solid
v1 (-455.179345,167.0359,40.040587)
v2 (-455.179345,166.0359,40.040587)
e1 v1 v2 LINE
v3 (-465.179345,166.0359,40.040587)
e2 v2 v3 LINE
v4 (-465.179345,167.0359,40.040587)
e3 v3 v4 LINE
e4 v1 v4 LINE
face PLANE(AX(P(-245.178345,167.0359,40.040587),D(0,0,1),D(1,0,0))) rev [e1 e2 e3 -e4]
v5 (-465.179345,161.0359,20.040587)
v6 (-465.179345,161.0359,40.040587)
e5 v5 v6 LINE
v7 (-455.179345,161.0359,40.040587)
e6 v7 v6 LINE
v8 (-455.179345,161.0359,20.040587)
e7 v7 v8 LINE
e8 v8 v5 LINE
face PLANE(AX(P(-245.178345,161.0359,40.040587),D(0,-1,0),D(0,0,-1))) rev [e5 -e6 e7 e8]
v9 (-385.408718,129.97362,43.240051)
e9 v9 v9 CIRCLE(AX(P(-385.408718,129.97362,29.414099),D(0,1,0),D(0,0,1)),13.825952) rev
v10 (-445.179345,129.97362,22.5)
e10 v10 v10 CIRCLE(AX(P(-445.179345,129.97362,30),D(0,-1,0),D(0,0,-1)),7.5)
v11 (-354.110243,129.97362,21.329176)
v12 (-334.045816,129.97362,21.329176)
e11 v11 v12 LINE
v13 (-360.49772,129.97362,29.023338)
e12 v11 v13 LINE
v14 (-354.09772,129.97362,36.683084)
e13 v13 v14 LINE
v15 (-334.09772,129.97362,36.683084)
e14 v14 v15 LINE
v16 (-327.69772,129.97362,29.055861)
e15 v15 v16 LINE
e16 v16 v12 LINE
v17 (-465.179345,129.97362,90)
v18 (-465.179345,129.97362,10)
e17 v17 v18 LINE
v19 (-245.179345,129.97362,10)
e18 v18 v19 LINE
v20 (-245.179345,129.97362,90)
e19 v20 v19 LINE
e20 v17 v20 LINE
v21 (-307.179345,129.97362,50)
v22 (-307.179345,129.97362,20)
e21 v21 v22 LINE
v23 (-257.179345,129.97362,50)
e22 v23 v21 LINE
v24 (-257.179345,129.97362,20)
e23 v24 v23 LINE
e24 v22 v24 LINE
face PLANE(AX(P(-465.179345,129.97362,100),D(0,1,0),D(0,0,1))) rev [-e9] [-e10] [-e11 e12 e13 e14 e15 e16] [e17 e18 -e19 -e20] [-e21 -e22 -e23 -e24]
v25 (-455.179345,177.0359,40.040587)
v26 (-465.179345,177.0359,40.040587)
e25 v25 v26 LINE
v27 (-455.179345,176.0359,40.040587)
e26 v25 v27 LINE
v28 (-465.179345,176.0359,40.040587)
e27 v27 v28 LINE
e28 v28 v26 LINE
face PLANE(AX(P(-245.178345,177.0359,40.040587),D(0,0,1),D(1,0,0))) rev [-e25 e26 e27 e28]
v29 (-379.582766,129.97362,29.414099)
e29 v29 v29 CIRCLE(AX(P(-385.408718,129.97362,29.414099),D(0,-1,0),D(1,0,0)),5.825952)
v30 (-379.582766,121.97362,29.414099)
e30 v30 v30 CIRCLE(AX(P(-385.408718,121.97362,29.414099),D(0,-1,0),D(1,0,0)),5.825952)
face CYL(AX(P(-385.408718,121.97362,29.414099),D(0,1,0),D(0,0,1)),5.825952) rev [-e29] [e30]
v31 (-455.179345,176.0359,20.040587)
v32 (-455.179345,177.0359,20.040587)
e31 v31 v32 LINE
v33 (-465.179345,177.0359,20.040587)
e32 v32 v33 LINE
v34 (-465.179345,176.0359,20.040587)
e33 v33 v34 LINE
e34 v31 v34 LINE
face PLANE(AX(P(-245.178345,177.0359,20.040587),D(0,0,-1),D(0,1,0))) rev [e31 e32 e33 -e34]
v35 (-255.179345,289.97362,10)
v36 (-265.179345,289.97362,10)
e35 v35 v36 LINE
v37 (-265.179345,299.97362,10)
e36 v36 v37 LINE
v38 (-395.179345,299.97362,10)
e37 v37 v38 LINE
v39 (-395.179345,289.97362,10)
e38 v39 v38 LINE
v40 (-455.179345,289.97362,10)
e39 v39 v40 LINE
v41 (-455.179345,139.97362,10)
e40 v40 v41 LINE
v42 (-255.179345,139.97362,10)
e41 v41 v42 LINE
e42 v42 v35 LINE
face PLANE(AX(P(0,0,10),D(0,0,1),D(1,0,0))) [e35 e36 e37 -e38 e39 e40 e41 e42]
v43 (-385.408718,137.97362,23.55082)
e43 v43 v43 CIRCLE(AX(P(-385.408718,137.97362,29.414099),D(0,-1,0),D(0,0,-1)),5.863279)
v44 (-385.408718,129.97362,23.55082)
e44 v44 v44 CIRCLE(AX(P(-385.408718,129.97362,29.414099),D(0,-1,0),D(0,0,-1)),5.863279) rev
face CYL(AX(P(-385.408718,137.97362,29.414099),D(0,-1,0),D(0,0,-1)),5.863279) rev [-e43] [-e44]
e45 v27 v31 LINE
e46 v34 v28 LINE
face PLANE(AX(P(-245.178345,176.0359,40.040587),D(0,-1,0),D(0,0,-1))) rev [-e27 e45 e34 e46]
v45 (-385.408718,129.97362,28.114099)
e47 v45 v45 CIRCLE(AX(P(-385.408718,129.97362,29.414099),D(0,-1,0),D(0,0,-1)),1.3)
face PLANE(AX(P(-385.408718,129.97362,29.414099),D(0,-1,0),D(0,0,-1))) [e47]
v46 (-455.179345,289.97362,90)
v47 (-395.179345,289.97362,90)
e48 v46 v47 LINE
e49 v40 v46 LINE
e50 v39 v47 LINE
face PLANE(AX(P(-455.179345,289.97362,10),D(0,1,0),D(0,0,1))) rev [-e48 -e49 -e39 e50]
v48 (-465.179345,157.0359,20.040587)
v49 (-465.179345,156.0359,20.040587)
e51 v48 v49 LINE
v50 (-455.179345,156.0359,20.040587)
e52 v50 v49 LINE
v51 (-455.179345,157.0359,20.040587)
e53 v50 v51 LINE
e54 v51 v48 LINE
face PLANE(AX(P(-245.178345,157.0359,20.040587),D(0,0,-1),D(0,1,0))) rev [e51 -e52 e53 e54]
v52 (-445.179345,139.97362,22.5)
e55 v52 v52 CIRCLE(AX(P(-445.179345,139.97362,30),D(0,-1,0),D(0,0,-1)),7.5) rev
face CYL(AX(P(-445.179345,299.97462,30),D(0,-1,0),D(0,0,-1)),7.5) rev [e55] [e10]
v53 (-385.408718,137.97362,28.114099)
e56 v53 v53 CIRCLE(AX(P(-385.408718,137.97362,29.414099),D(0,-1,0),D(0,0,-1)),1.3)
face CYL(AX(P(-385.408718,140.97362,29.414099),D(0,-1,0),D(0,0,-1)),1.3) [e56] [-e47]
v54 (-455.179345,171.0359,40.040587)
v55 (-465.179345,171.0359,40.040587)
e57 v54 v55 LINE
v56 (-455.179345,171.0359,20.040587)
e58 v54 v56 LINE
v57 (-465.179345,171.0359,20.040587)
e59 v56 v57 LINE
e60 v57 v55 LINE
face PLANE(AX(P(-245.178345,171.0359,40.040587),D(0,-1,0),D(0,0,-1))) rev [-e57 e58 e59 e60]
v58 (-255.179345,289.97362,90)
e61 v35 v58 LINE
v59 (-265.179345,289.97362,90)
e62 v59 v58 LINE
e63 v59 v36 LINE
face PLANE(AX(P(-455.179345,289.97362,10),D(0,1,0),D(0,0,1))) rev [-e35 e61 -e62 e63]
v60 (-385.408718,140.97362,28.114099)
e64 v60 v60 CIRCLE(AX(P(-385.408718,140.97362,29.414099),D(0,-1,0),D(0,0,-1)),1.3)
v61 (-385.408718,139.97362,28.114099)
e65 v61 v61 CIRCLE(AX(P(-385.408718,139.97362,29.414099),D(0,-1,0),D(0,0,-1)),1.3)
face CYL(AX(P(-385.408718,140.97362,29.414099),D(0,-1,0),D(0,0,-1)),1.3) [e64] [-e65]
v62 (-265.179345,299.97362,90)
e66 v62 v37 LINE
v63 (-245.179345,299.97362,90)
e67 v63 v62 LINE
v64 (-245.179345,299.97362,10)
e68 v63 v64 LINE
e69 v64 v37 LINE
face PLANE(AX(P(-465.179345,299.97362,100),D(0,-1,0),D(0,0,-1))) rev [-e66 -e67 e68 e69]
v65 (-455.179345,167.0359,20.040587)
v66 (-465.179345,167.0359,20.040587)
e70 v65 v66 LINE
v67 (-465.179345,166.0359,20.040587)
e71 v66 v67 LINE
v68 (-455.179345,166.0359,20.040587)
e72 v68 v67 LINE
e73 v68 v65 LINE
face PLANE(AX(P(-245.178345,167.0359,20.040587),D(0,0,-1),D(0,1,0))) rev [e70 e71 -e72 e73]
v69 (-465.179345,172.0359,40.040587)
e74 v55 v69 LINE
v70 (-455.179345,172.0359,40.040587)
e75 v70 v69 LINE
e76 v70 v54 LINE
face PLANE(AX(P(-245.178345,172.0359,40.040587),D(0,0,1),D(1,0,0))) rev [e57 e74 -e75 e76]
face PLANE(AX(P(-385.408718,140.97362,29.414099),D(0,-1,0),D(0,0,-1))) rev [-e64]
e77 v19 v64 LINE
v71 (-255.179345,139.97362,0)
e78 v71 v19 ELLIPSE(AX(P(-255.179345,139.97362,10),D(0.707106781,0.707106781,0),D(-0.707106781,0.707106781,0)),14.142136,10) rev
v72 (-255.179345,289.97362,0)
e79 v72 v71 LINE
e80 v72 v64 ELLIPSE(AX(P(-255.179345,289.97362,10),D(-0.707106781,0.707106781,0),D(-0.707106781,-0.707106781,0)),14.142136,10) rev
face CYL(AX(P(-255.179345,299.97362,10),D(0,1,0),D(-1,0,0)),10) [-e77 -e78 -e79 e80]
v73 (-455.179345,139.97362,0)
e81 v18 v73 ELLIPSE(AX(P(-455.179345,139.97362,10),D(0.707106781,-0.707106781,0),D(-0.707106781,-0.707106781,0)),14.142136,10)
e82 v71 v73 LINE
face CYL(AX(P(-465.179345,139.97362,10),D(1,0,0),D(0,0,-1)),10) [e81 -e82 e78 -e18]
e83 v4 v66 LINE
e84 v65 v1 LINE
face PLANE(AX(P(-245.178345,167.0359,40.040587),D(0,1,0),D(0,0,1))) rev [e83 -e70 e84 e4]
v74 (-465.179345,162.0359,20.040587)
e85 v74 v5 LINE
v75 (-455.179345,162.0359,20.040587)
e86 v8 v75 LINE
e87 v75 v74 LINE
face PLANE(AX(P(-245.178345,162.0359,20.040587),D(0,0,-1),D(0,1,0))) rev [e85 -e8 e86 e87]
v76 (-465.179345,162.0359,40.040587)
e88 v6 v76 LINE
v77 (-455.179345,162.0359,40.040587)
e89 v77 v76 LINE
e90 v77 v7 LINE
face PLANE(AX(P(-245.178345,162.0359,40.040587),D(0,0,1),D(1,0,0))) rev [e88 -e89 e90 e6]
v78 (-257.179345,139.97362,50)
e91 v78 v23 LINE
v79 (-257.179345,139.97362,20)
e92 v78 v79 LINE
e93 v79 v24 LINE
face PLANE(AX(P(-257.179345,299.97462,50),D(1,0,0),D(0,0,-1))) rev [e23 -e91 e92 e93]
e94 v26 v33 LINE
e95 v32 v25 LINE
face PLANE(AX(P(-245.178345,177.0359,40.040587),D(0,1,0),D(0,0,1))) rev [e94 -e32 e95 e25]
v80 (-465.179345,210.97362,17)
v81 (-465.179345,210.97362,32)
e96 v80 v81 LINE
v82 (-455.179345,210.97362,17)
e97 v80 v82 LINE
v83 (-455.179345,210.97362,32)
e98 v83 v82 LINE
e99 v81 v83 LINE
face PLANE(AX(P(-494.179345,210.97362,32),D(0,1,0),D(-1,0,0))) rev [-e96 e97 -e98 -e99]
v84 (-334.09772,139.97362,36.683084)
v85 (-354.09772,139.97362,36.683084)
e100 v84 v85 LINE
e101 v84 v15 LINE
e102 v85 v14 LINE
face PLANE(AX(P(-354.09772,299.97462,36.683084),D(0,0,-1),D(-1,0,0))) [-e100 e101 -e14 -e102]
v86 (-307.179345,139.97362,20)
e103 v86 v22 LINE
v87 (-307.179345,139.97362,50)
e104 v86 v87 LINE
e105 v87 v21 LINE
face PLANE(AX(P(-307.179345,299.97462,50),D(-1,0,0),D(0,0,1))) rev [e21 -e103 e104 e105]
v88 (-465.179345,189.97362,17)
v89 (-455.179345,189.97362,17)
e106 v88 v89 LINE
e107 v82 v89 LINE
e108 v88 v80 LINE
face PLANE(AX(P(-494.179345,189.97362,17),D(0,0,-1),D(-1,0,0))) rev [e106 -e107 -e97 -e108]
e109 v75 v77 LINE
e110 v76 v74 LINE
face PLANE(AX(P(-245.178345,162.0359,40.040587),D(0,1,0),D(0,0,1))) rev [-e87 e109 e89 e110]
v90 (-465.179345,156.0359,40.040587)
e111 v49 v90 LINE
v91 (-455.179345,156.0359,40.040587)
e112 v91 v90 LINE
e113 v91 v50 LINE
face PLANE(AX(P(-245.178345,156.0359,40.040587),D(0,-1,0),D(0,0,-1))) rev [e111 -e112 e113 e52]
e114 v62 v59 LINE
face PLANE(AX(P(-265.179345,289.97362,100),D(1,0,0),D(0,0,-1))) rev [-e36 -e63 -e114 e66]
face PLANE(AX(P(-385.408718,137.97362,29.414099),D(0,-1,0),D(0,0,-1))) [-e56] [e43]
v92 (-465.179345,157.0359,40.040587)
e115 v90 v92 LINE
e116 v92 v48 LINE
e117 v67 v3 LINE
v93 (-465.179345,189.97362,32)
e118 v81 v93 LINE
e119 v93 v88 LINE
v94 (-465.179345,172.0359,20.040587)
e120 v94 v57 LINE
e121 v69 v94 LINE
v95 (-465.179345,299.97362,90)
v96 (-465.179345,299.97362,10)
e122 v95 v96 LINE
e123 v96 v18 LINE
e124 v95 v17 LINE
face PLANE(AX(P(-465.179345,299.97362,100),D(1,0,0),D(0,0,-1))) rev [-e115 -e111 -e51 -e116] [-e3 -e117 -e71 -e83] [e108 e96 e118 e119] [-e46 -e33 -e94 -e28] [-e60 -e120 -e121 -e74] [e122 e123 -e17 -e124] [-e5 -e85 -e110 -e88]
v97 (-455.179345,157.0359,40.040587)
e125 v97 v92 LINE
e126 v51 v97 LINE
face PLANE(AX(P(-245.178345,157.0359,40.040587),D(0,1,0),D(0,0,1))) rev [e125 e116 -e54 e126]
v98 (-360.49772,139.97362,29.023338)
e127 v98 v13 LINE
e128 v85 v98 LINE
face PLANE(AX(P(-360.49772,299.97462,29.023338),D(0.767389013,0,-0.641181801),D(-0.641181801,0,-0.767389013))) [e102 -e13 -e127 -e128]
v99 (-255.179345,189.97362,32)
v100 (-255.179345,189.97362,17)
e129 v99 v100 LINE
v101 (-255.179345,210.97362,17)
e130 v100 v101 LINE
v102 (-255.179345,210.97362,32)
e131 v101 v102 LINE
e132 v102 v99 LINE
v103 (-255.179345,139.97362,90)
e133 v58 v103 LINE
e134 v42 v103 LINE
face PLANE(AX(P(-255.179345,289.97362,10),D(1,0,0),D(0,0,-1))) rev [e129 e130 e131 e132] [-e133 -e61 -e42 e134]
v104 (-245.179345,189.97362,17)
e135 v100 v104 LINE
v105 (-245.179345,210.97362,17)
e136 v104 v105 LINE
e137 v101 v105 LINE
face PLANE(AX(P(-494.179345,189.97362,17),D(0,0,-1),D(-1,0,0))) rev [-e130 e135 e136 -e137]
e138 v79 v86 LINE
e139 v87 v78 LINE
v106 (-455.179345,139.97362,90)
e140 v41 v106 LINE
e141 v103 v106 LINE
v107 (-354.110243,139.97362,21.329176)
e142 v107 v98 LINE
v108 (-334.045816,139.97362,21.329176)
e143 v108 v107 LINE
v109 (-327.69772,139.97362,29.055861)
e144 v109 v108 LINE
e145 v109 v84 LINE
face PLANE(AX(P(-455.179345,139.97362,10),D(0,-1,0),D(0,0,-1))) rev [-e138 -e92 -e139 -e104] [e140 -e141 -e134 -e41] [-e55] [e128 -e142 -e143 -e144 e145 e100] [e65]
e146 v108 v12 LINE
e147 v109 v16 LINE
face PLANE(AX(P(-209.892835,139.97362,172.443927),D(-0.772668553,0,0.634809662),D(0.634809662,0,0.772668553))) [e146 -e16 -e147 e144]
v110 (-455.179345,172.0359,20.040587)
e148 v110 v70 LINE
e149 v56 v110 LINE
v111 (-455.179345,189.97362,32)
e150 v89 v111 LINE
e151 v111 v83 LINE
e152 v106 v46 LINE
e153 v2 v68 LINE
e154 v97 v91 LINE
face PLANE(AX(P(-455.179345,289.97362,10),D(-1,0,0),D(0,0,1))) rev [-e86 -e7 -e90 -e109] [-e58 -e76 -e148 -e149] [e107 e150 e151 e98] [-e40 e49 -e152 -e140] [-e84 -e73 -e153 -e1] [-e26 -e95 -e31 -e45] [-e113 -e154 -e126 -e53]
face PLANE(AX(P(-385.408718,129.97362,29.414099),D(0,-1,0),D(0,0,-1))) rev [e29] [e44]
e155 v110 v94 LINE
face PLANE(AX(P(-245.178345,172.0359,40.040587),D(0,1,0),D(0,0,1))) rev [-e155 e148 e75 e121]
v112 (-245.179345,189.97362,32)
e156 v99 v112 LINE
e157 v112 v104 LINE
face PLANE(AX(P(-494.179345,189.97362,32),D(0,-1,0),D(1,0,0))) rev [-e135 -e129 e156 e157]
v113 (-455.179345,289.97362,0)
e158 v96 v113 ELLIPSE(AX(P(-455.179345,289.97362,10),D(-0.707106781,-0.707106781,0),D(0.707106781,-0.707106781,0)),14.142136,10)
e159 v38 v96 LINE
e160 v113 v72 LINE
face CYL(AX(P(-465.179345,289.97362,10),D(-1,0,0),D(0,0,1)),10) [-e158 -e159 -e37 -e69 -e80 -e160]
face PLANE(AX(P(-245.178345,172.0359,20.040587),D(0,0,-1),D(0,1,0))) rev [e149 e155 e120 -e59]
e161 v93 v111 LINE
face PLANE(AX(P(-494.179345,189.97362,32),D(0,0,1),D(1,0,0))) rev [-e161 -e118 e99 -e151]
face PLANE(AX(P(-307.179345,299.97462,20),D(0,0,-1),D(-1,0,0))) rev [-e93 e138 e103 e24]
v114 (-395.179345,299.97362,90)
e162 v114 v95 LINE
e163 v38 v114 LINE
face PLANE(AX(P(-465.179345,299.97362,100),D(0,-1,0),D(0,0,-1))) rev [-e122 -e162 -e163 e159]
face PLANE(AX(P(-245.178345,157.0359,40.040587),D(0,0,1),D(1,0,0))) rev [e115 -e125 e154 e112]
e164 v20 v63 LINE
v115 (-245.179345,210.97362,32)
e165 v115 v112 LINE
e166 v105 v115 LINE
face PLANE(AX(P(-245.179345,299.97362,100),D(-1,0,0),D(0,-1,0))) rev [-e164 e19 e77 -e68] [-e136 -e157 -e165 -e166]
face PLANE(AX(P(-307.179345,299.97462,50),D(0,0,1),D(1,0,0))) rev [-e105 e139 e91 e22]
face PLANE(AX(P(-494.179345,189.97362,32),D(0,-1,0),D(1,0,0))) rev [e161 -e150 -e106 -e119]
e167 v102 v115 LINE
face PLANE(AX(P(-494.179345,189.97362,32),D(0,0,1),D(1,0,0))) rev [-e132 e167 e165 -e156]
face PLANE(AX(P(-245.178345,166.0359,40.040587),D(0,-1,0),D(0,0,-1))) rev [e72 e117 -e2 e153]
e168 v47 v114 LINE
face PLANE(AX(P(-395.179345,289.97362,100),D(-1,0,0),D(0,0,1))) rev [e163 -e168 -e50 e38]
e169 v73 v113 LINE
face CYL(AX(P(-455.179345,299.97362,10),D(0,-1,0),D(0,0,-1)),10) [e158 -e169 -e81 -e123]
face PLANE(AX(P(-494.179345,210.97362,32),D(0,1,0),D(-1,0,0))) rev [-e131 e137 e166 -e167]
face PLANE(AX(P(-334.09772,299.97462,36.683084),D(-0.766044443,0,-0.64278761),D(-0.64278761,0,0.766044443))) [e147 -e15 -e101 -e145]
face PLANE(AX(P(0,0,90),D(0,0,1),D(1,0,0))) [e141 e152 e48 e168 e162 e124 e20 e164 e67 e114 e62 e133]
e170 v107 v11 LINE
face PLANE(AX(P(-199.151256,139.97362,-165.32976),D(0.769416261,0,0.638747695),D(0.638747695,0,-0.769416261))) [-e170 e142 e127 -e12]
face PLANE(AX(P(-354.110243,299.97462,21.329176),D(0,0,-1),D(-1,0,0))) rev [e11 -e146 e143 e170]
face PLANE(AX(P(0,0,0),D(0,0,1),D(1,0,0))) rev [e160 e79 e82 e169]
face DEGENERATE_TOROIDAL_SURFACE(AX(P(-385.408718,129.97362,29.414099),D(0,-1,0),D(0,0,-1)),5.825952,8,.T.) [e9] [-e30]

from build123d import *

# Parameters (mm, degrees)
SKETCH1_W                = 220
SKETCH1_H                = 170
BOSS_EXTRUDE1_DEPTH      = 100
SKETCH3_W                = 200
SKETCH3_H                = 150
CUT_EXTRUDE2_DEPTH       = 90
FILLET1_R                = 10
SKETCH4_W                = 130
SKETCH4_H                = 90
CUT_EXTRUDE3_DEPTH       = 10
SKETCH8_W                = 223.528125383
SKETCH8_H                = 171.877504909
CUT_EXTRUDE5_DEPTH       = 10
CUT_EXTRUDE7_REACH       = 505.38
SKETCH9_R                = 7.5
CUT_EXTRUDE8_REACH       = 505.38
SKETCH10_W               = 50
SKETCH10_H               = 30
CUT_EXTRUDE9_REACH       = 384.733
SKETCH11_W               = 20
SKETCH11_H               = 1
CUT_EXTRUDE10_REACH      = 505.38
CUT_EXTRUDE11_DEPTH      = 10
CUT_EXTRUDE12_REACH      = 505.38
SKETCH15_R               = 5.863278905
CUT_EXTRUDE13_DEPTH      = 8
BOSS_EXTRUDE3_DEPTH      = 8
BOSS_EXTRUDE3_DEPTH_BACK = 3
SKETCH16_R               = 1.3
SKETCH17_R               = 13.825952239
SKETCH17_R_2             = 5.825952239
EXTRUDE_THIN1_DEPTH      = 8
FILLET2_R                = 8
SKETCH18_W               = 15
SKETCH18_H               = 21
CUT_EXTRUDE14_DEPTH      = 249


with BuildPart() as part:
    # Sketch1 → Boss-Extrude1 (new body)
    with BuildSketch(Plane.XY):
        with Locations((-355.179344655, 214.973620006)):
            Rectangle(SKETCH1_W, SKETCH1_H)
    extrude(amount=BOSS_EXTRUDE1_DEPTH)

    # Sketch3 → Cut-Extrude2 (cut)
    with BuildSketch(Plane.XY.offset(100)):
        with Locations((-355.179344655, 214.973620006)):
            Rectangle(SKETCH3_W, SKETCH3_H)
    extrude(amount=-CUT_EXTRUDE2_DEPTH, mode=Mode.SUBTRACT)

    # Fillet1
    fillet1_edges = [part.edges().sort_by_distance(p)[0] for p in [
        (-355.179344655, 299.973620006, 0),
        (-245.179344655, 214.973620006, 0),
        (-355.179344655, 129.973620006, 0),
        (-465.179344655, 214.973620006, 0),
    ]]
    fillet(fillet1_edges, radius=FILLET1_R)

    # Sketch4 → Cut-Extrude3 (cut)
    with BuildSketch(Plane(origin=(0, 299.973620006, 0), x_dir=(1, 0, 0), z_dir=(0, 1, 0))):
        with Locations((-330.179344655, -55)):
            Rectangle(SKETCH4_W, SKETCH4_H)
    extrude(amount=-CUT_EXTRUDE3_DEPTH, mode=Mode.SUBTRACT)

    # Sketch8 → Cut-Extrude5 (cut)
    with BuildSketch(Plane.XY.offset(90)):
        with Locations((-354.80209528, 215.143634814)):
            Rectangle(SKETCH8_W, SKETCH8_H)
    extrude(amount=CUT_EXTRUDE5_DEPTH, mode=Mode.SUBTRACT)

    # Sketch9 → Cut-Extrude7 (cut, up to next)
    with BuildSketch(Plane.XZ.offset(-129.973620006), mode=Mode.PRIVATE) as cut_extrude7_sk1:
        with Locations(Location((-445.179344655, 30, 0), (0, 0, 270))):
            Circle(SKETCH9_R)
    cut_extrude7_tool1 = extrude(cut_extrude7_sk1.sketch, amount=-CUT_EXTRUDE7_REACH, mode=Mode.PRIVATE) & part.part
    add(cut_extrude7_tool1.solids().sort_by_distance((-445.179345, 129.97362, 30))[0], mode=Mode.SUBTRACT)

    # Sketch10 → Cut-Extrude8 (cut, up to next)
    with BuildSketch(Plane.XZ.offset(-129.973620006), mode=Mode.PRIVATE) as cut_extrude8_sk1:
        with Locations((-282.179344655, 35)):
            Rectangle(SKETCH10_W, SKETCH10_H)
    cut_extrude8_tool1 = extrude(cut_extrude8_sk1.sketch, amount=-CUT_EXTRUDE8_REACH, mode=Mode.PRIVATE) & part.part
    add(cut_extrude8_tool1.solids().sort_by_distance((-282.179345, 129.97362, 35))[0], mode=Mode.SUBTRACT)

    # Sketch11 → Cut-Extrude9 (cut, up to next)
    with BuildSketch(Plane.ZY.offset(465.179344655), mode=Mode.PRIVATE) as cut_extrude9_sk1:
        with Locations((30.04058668, 161.535899553)):
            Rectangle(SKETCH11_W, SKETCH11_H)
    cut_extrude9_tool1 = extrude(cut_extrude9_sk1.sketch, amount=-CUT_EXTRUDE9_REACH, mode=Mode.PRIVATE) & part.part
    # Sketch11 → Cut-Extrude9 (cut, up to next)
    with BuildSketch(Plane.ZY.offset(465.179344655), mode=Mode.PRIVATE) as cut_extrude9_sk2:
        with Locations((30.04058668, 156.535899553)):
            Rectangle(SKETCH11_W, SKETCH11_H)
    cut_extrude9_tool2 = extrude(cut_extrude9_sk2.sketch, amount=-CUT_EXTRUDE9_REACH, mode=Mode.PRIVATE) & part.part
    # Sketch11 → Cut-Extrude9 (cut, up to next)
    with BuildSketch(Plane.ZY.offset(465.179344655), mode=Mode.PRIVATE) as cut_extrude9_sk3:
        with Locations((30.04058668, 166.535899553)):
            Rectangle(SKETCH11_W, SKETCH11_H)
    cut_extrude9_tool3 = extrude(cut_extrude9_sk3.sketch, amount=-CUT_EXTRUDE9_REACH, mode=Mode.PRIVATE) & part.part
    # Sketch11 → Cut-Extrude9 (cut, up to next)
    with BuildSketch(Plane.ZY.offset(465.179344655), mode=Mode.PRIVATE) as cut_extrude9_sk4:
        with Locations((30.04058668, 171.535899553)):
            Rectangle(SKETCH11_W, SKETCH11_H)
    cut_extrude9_tool4 = extrude(cut_extrude9_sk4.sketch, amount=-CUT_EXTRUDE9_REACH, mode=Mode.PRIVATE) & part.part
    # Sketch11 → Cut-Extrude9 (cut, up to next)
    with BuildSketch(Plane.ZY.offset(465.179344655), mode=Mode.PRIVATE) as cut_extrude9_sk5:
        with Locations((30.04058668, 176.535899553)):
            Rectangle(SKETCH11_W, SKETCH11_H)
    cut_extrude9_tool5 = extrude(cut_extrude9_sk5.sketch, amount=-CUT_EXTRUDE9_REACH, mode=Mode.PRIVATE) & part.part
    add(cut_extrude9_tool1.solids().sort_by_distance((-465.179345, 161.5359, 30.040587))[0], mode=Mode.SUBTRACT)
    add(cut_extrude9_tool2.solids().sort_by_distance((-465.179345, 156.5359, 30.040587))[0], mode=Mode.SUBTRACT)
    add(cut_extrude9_tool3.solids().sort_by_distance((-465.179345, 166.5359, 30.040587))[0], mode=Mode.SUBTRACT)
    add(cut_extrude9_tool4.solids().sort_by_distance((-465.179345, 171.5359, 30.040587))[0], mode=Mode.SUBTRACT)
    add(cut_extrude9_tool5.solids().sort_by_distance((-465.179345, 176.5359, 30.040587))[0], mode=Mode.SUBTRACT)

    # Sketch12 → Cut-Extrude10 (cut, up to next)
    with BuildSketch(Plane.XZ.offset(-129.973620006), mode=Mode.PRIVATE) as cut_extrude10_sk1:
        Polygon((-354.097719845, 36.683084204), (-334.097719845, 36.683084204), (-327.697719845, 29.055861211), (-335.358164277, 22.627985114), (-352.790666107, 22.627985114), (-360.497719845, 29.023338287), align=None)
    cut_extrude10_tool1 = extrude(cut_extrude10_sk1.sketch, amount=-CUT_EXTRUDE10_REACH, mode=Mode.PRIVATE) & part.part
    add(cut_extrude10_tool1.solids().sort_by_distance((-344.093749, 129.97362, 29.715571))[0], mode=Mode.SUBTRACT)

    # Sketch13 → Cut-Extrude11 (cut)
    with BuildSketch(Plane.XZ.offset(-129.973620006)):
        Polygon((-360.497719845, 29.023338287), (-354.110242897, 21.329175679), (-354.11397805, 22.529175679), (-354.117713203, 23.729175679), align=None)
        Polygon((-334.045816465, 21.329175679), (-327.697719845, 29.055861211), (-334.045816465, 23.729175679), (-334.045816465, 22.627985114), align=None)
    extrude(amount=-CUT_EXTRUDE11_DEPTH, mode=Mode.SUBTRACT)

    # Sketch14 → Cut-Extrude12 (cut, up to next)
    with BuildSketch(Plane.XZ.offset(-129.973620006), mode=Mode.PRIVATE) as cut_extrude12_sk1:
        Polygon((-354.117713203, 23.729175679), (-354.110242897, 21.329175679), (-334.045816465, 21.329175679), (-334.045816465, 23.729175679), align=None)
    cut_extrude12_tool1 = extrude(cut_extrude12_sk1.sketch, amount=-CUT_EXTRUDE12_REACH, mode=Mode.PRIVATE) & part.part
    add(cut_extrude12_tool1.solids().sort_by_distance((-344.079897, 129.97362, 22.52925))[0], mode=Mode.SUBTRACT)

    # Sketch15 → Cut-Extrude13 (cut)
    with BuildSketch(Plane.XZ.offset(-129.973620006)):
        with Locations(Location((-385.408718364, 29.414099171, 0), (0, 0, 270))):
            Circle(SKETCH15_R)
    extrude(amount=-CUT_EXTRUDE13_DEPTH, mode=Mode.SUBTRACT)

    # Sketch16 → Boss-Extrude3 (add, two sides: drawn at the far end of the back side and taken through both)
    with BuildSketch(Plane.XZ.offset(-137.973620006).offset(-BOSS_EXTRUDE3_DEPTH_BACK)):
        with Locations(Location((-385.408718364, 29.414099171, 0), (0, 0, 270))):
            Circle(SKETCH16_R)
    extrude(amount=BOSS_EXTRUDE3_DEPTH + BOSS_EXTRUDE3_DEPTH_BACK)

    # Sketch17 → Extrude-Thin1 (add)
    with BuildSketch(Plane.XZ.offset(-129.973620006)):
        with Locations((-385.408718364, 29.414099171)):
            Circle(SKETCH17_R)
        with Locations((-385.408718364, 29.414099171)):
            Circle(SKETCH17_R_2, mode=Mode.SUBTRACT)
    extrude(amount=EXTRUDE_THIN1_DEPTH)

    # Fillet2
    fillet2_edges = [part.edges().sort_by_distance(p)[0] for p in [
        (-399.234670603, 121.973620006, 29.414099171),
    ]]
    fillet(fillet2_edges, radius=FILLET2_R - 0.0001)  # a hair under: the kernel refuses the full size

    # Sketch18 → Cut-Extrude14 (cut)
    with BuildSketch(Plane(origin=(-245.179344655, 0, 0), x_dir=(0, 0, -1), z_dir=(1, 0, 0))):
        with Locations((-24.5, 200.473620006)):
            Rectangle(SKETCH18_W, SKETCH18_H)
    extrude(amount=-CUT_EXTRUDE14_DEPTH, mode=Mode.SUBTRACT)


solid = part.part
